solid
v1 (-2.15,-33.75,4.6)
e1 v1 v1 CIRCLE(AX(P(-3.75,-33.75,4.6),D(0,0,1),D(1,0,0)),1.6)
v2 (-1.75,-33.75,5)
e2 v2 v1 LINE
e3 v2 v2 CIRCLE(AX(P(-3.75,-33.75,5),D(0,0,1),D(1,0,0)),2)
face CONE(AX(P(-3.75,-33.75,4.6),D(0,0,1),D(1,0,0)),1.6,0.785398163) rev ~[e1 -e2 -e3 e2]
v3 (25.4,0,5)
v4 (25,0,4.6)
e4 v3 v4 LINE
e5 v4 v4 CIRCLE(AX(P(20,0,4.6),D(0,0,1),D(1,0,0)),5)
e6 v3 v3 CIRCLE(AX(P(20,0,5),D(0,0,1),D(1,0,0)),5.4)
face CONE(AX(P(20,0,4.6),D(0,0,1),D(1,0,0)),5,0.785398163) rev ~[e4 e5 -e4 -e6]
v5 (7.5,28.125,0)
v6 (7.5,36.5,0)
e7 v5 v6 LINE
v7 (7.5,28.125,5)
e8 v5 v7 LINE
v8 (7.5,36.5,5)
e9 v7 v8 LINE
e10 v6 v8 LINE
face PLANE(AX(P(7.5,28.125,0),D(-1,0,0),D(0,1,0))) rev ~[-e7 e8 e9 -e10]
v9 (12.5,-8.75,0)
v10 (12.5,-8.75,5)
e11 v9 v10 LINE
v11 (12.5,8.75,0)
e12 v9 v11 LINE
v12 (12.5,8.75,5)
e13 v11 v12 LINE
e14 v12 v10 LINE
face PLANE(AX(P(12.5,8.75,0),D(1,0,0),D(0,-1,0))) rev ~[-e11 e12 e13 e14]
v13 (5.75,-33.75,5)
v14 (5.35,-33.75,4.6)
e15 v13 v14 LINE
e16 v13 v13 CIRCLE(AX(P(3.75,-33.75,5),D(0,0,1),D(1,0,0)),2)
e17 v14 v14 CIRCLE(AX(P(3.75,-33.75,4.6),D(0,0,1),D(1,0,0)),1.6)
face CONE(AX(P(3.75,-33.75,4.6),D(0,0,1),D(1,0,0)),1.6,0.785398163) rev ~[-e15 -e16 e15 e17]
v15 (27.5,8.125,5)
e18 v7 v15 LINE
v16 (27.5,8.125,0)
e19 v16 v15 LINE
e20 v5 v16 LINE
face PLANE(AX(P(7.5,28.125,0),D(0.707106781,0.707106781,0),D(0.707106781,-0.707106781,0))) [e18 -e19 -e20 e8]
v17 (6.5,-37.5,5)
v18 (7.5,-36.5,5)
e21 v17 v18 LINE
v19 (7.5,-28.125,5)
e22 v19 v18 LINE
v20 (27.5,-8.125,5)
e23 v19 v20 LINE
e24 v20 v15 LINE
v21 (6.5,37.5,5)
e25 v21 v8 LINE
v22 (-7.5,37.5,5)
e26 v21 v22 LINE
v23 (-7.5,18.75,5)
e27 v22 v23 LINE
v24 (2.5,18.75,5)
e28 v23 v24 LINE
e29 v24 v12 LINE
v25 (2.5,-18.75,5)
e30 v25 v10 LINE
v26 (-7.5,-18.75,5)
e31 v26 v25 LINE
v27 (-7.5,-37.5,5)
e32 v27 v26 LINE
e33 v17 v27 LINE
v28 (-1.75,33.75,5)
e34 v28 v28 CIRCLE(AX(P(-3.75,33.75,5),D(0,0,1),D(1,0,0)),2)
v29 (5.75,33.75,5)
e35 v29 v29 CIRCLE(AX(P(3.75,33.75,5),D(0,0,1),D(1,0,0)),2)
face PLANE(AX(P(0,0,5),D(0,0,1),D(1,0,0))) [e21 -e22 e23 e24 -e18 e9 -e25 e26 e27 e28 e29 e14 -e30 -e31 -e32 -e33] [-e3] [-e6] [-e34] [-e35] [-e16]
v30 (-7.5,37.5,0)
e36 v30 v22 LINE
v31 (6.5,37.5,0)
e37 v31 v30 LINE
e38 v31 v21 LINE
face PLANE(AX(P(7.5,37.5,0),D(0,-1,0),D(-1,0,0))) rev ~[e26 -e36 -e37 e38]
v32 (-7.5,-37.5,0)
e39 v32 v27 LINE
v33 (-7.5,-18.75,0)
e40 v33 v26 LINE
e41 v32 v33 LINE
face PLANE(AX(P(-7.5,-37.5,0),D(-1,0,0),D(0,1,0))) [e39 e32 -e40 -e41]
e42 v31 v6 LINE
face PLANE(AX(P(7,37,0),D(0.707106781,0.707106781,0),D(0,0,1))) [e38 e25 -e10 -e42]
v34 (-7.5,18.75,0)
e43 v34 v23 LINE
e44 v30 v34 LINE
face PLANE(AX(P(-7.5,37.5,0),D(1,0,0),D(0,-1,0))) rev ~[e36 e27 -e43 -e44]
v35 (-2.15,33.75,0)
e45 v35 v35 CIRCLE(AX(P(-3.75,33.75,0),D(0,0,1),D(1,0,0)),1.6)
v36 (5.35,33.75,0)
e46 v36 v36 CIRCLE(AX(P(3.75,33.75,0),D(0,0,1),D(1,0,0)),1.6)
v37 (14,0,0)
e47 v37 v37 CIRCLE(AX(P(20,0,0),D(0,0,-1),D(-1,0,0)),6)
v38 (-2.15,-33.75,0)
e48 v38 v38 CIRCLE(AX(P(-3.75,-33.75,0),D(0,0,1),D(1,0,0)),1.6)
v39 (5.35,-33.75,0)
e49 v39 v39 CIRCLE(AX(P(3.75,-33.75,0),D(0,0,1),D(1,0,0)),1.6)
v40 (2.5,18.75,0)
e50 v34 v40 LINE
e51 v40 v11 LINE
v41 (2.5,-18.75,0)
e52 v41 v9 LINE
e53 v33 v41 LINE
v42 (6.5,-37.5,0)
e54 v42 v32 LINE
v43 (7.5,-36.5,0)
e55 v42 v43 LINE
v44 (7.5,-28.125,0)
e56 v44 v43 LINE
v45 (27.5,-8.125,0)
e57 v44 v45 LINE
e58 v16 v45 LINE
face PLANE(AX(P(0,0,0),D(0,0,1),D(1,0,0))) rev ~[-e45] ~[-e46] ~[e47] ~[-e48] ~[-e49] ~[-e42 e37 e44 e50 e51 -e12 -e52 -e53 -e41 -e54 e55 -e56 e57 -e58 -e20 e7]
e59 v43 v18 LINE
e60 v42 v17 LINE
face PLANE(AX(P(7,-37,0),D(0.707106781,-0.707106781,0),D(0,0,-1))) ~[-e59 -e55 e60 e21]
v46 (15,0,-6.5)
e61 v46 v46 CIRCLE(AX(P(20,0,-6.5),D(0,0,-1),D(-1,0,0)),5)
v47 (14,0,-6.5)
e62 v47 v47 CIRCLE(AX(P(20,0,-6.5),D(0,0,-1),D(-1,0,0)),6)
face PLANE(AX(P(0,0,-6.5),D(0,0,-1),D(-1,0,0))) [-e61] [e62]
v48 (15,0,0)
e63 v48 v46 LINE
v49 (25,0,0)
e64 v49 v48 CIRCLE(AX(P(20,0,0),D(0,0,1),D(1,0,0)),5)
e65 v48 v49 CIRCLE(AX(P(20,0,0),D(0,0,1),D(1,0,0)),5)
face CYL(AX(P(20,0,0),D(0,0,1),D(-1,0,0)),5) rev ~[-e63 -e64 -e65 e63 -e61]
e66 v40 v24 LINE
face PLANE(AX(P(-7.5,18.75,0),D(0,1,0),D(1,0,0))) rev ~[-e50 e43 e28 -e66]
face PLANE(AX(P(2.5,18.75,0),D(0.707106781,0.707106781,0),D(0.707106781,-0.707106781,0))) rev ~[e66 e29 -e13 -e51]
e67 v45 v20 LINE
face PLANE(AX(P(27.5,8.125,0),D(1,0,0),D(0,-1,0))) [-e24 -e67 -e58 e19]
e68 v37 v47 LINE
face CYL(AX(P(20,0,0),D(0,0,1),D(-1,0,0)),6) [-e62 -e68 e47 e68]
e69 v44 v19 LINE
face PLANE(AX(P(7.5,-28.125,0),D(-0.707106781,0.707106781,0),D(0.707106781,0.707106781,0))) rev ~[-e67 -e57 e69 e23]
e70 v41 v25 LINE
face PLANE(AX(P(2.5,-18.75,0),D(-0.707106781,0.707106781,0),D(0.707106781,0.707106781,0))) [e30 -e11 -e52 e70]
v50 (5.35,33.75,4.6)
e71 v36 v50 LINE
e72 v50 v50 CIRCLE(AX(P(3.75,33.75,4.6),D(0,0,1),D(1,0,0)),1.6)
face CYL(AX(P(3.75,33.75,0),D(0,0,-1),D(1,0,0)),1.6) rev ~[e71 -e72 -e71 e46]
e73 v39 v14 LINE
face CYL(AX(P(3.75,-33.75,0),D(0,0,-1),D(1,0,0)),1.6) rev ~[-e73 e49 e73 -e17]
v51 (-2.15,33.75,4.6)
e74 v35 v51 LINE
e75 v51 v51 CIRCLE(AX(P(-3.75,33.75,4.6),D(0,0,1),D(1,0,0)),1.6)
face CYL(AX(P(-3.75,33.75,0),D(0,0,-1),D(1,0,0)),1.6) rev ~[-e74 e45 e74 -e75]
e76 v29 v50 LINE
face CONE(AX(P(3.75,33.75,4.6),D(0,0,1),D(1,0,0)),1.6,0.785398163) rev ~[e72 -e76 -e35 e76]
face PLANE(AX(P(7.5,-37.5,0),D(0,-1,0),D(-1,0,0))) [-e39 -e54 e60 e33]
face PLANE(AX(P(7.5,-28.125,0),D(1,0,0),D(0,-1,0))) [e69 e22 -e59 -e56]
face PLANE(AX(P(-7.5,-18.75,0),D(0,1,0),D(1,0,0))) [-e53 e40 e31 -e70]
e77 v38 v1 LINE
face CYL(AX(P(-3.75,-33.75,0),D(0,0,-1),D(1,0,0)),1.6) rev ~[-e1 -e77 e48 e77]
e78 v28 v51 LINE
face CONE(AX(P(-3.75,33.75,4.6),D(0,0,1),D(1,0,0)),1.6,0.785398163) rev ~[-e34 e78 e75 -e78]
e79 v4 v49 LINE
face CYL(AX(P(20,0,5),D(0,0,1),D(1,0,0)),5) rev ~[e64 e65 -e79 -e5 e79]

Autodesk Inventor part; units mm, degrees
ref_plane "YZ Plane" through (0, 0, 0) normal (1, 0, 0) x (0, 1, 0)
ref_plane "XZ Plane" through (0, 0, 0) normal (0, 1, 0) x (-1, 0, 0)
sketch "Sketch1" plane through (0, 0, 0) normal (0, 0, 1) x (1, 0, 0)
  line L0 (-5.8474, 0) -> (5.8474, 0) construction
  line L1 (2.5, 18.75) -> (7.5, 18.75)
  line L2 (7.5, 18.75) -> (7.5, 37.5)
  line L3 (7.5, 37.5) -> (-7.5, 37.5)
  line L4 (-7.5, 37.5) -> (-7.5, 18.75)
  line L5 (-7.5, 18.75) -> (2.5, 18.75)
  circle A0 centre (3.75, 33.75) radius 1.6
  circle A1 centre (-3.75, 33.75) radius 1.6
  line L6 (2.5, -18.75) -> (7.5, -18.75)
  line L7 (7.5, -18.75) -> (7.5, -37.5)
  line L8 (7.5, -37.5) -> (-7.5, -37.5)
  line L9 (-7.5, -37.5) -> (-7.5, -18.75)
  line L10 (-7.5, -18.75) -> (2.5, -18.75)
  circle A2 centre (3.75, -33.75) radius 1.6
  circle A3 centre (-3.75, -33.75) radius 1.6
  line L11 (7.5, 28.125) -> (27.5, 8.125)
  line L12 (7.5, 28.125) -> (35.7843, 28.125) construction
  line L13 (2.5, 18.75) -> (12.5, 8.75)
  line L14 (12.5, 8.75) -> (12.5, 0)
  line L15 (27.5, 8.125) -> (27.5, 0)
  line L16 (7.5, -28.125) -> (27.5, -8.125)
  line L17 (2.5, -18.75) -> (12.5, -8.75)
  line L18 (12.5, -8.75) -> (12.5, 0)
  line L19 (27.5, -8.125) -> (27.5, 0)
  point P0 (0, 0)
  point P1 (0, 0)
  point P2 (2.5, -18.75)
  point P3 (2.5, -18.75)
  point P4 (2.5, 18.75)
  dimension "d2" = 15
  dimension "d3" = 18.75
  dimension "d4" = 7.5
  dimension "d5" = 3.2
  dimension "d6" = 3.2
  dimension "d7" = 3.75
  dimension "d8" = 3.75
  dimension "d9" = 7.5
  dimension "d10" = 18.75
  dimension "d20" = 45
  dimension "d21" = 20
  dimension "d31" = 20
  dimension "d32" = 10
ref_plane "Work Plane1" through (0, 0, 5) normal (0, 0, 1) x (1, 0, 0)
extrude "Extrusion3" add sketch "Sketch1" along normal blind 5
chamfer "Chamfer4" distance 0.4 angle 45 4 edges at (2.15, 33.75, 5) (-5.35, 33.75, 5) (2.15, -33.75, 5) (-5.35, -33.75, 5)
sketch "Sketch4" plane through (0, 0, 5) normal (0, 0, 1) x (1, 0, 0)
  circle A0 centre (20, 0) radius 5
  line L0 (27.5, -8.125) -> (27.5, 8.125) projected
  line L1 (12.5, 8.75) -> (12.5, -8.75) projected
  point P0 (0, 0)
  point P1 (12.5, 0)
  dimension "d40" = 10
  dimension "d41" = 15
  dimension "d42" = 7.5
extrude "Extrusion5" cut sketch "Sketch4" against normal blind 5
chamfer "Chamfer5" distance 0.4 angle 45 1 edges at (15, 0, 5)
sketch "Sketch5" plane through (0, 0, 0) normal (0, 0, -1) x (-1, 0, 0)
  circle A0 centre (-20, 0) radius 5 projected
  circle A1 centre (-20, 0) radius 5
  circle A2 centre (-20, 0) radius 6
  point P0 (0, 0)
  dimension "d48" = 12
extrude "Extrusion6" add sketch "Sketch5" along normal blind 6.5
chamfer "Chamfer6" distance 1 angle 45 2 edges at (7.5, 37.5, 2.5) (7.5, -37.5, 2.5)
equation "\"d4\" = 0.5 * d2"
equation "\"d7\" = 0.25 * d2"
equation "\"d8\" = d7"
equation "\"d9\" = 0.5 * d2"
equation "\"d31\" = d21"
equation "\"d42\" = 0.5 * d41"
properties part number "uchwyt-GM" material "Stainless Steel"
